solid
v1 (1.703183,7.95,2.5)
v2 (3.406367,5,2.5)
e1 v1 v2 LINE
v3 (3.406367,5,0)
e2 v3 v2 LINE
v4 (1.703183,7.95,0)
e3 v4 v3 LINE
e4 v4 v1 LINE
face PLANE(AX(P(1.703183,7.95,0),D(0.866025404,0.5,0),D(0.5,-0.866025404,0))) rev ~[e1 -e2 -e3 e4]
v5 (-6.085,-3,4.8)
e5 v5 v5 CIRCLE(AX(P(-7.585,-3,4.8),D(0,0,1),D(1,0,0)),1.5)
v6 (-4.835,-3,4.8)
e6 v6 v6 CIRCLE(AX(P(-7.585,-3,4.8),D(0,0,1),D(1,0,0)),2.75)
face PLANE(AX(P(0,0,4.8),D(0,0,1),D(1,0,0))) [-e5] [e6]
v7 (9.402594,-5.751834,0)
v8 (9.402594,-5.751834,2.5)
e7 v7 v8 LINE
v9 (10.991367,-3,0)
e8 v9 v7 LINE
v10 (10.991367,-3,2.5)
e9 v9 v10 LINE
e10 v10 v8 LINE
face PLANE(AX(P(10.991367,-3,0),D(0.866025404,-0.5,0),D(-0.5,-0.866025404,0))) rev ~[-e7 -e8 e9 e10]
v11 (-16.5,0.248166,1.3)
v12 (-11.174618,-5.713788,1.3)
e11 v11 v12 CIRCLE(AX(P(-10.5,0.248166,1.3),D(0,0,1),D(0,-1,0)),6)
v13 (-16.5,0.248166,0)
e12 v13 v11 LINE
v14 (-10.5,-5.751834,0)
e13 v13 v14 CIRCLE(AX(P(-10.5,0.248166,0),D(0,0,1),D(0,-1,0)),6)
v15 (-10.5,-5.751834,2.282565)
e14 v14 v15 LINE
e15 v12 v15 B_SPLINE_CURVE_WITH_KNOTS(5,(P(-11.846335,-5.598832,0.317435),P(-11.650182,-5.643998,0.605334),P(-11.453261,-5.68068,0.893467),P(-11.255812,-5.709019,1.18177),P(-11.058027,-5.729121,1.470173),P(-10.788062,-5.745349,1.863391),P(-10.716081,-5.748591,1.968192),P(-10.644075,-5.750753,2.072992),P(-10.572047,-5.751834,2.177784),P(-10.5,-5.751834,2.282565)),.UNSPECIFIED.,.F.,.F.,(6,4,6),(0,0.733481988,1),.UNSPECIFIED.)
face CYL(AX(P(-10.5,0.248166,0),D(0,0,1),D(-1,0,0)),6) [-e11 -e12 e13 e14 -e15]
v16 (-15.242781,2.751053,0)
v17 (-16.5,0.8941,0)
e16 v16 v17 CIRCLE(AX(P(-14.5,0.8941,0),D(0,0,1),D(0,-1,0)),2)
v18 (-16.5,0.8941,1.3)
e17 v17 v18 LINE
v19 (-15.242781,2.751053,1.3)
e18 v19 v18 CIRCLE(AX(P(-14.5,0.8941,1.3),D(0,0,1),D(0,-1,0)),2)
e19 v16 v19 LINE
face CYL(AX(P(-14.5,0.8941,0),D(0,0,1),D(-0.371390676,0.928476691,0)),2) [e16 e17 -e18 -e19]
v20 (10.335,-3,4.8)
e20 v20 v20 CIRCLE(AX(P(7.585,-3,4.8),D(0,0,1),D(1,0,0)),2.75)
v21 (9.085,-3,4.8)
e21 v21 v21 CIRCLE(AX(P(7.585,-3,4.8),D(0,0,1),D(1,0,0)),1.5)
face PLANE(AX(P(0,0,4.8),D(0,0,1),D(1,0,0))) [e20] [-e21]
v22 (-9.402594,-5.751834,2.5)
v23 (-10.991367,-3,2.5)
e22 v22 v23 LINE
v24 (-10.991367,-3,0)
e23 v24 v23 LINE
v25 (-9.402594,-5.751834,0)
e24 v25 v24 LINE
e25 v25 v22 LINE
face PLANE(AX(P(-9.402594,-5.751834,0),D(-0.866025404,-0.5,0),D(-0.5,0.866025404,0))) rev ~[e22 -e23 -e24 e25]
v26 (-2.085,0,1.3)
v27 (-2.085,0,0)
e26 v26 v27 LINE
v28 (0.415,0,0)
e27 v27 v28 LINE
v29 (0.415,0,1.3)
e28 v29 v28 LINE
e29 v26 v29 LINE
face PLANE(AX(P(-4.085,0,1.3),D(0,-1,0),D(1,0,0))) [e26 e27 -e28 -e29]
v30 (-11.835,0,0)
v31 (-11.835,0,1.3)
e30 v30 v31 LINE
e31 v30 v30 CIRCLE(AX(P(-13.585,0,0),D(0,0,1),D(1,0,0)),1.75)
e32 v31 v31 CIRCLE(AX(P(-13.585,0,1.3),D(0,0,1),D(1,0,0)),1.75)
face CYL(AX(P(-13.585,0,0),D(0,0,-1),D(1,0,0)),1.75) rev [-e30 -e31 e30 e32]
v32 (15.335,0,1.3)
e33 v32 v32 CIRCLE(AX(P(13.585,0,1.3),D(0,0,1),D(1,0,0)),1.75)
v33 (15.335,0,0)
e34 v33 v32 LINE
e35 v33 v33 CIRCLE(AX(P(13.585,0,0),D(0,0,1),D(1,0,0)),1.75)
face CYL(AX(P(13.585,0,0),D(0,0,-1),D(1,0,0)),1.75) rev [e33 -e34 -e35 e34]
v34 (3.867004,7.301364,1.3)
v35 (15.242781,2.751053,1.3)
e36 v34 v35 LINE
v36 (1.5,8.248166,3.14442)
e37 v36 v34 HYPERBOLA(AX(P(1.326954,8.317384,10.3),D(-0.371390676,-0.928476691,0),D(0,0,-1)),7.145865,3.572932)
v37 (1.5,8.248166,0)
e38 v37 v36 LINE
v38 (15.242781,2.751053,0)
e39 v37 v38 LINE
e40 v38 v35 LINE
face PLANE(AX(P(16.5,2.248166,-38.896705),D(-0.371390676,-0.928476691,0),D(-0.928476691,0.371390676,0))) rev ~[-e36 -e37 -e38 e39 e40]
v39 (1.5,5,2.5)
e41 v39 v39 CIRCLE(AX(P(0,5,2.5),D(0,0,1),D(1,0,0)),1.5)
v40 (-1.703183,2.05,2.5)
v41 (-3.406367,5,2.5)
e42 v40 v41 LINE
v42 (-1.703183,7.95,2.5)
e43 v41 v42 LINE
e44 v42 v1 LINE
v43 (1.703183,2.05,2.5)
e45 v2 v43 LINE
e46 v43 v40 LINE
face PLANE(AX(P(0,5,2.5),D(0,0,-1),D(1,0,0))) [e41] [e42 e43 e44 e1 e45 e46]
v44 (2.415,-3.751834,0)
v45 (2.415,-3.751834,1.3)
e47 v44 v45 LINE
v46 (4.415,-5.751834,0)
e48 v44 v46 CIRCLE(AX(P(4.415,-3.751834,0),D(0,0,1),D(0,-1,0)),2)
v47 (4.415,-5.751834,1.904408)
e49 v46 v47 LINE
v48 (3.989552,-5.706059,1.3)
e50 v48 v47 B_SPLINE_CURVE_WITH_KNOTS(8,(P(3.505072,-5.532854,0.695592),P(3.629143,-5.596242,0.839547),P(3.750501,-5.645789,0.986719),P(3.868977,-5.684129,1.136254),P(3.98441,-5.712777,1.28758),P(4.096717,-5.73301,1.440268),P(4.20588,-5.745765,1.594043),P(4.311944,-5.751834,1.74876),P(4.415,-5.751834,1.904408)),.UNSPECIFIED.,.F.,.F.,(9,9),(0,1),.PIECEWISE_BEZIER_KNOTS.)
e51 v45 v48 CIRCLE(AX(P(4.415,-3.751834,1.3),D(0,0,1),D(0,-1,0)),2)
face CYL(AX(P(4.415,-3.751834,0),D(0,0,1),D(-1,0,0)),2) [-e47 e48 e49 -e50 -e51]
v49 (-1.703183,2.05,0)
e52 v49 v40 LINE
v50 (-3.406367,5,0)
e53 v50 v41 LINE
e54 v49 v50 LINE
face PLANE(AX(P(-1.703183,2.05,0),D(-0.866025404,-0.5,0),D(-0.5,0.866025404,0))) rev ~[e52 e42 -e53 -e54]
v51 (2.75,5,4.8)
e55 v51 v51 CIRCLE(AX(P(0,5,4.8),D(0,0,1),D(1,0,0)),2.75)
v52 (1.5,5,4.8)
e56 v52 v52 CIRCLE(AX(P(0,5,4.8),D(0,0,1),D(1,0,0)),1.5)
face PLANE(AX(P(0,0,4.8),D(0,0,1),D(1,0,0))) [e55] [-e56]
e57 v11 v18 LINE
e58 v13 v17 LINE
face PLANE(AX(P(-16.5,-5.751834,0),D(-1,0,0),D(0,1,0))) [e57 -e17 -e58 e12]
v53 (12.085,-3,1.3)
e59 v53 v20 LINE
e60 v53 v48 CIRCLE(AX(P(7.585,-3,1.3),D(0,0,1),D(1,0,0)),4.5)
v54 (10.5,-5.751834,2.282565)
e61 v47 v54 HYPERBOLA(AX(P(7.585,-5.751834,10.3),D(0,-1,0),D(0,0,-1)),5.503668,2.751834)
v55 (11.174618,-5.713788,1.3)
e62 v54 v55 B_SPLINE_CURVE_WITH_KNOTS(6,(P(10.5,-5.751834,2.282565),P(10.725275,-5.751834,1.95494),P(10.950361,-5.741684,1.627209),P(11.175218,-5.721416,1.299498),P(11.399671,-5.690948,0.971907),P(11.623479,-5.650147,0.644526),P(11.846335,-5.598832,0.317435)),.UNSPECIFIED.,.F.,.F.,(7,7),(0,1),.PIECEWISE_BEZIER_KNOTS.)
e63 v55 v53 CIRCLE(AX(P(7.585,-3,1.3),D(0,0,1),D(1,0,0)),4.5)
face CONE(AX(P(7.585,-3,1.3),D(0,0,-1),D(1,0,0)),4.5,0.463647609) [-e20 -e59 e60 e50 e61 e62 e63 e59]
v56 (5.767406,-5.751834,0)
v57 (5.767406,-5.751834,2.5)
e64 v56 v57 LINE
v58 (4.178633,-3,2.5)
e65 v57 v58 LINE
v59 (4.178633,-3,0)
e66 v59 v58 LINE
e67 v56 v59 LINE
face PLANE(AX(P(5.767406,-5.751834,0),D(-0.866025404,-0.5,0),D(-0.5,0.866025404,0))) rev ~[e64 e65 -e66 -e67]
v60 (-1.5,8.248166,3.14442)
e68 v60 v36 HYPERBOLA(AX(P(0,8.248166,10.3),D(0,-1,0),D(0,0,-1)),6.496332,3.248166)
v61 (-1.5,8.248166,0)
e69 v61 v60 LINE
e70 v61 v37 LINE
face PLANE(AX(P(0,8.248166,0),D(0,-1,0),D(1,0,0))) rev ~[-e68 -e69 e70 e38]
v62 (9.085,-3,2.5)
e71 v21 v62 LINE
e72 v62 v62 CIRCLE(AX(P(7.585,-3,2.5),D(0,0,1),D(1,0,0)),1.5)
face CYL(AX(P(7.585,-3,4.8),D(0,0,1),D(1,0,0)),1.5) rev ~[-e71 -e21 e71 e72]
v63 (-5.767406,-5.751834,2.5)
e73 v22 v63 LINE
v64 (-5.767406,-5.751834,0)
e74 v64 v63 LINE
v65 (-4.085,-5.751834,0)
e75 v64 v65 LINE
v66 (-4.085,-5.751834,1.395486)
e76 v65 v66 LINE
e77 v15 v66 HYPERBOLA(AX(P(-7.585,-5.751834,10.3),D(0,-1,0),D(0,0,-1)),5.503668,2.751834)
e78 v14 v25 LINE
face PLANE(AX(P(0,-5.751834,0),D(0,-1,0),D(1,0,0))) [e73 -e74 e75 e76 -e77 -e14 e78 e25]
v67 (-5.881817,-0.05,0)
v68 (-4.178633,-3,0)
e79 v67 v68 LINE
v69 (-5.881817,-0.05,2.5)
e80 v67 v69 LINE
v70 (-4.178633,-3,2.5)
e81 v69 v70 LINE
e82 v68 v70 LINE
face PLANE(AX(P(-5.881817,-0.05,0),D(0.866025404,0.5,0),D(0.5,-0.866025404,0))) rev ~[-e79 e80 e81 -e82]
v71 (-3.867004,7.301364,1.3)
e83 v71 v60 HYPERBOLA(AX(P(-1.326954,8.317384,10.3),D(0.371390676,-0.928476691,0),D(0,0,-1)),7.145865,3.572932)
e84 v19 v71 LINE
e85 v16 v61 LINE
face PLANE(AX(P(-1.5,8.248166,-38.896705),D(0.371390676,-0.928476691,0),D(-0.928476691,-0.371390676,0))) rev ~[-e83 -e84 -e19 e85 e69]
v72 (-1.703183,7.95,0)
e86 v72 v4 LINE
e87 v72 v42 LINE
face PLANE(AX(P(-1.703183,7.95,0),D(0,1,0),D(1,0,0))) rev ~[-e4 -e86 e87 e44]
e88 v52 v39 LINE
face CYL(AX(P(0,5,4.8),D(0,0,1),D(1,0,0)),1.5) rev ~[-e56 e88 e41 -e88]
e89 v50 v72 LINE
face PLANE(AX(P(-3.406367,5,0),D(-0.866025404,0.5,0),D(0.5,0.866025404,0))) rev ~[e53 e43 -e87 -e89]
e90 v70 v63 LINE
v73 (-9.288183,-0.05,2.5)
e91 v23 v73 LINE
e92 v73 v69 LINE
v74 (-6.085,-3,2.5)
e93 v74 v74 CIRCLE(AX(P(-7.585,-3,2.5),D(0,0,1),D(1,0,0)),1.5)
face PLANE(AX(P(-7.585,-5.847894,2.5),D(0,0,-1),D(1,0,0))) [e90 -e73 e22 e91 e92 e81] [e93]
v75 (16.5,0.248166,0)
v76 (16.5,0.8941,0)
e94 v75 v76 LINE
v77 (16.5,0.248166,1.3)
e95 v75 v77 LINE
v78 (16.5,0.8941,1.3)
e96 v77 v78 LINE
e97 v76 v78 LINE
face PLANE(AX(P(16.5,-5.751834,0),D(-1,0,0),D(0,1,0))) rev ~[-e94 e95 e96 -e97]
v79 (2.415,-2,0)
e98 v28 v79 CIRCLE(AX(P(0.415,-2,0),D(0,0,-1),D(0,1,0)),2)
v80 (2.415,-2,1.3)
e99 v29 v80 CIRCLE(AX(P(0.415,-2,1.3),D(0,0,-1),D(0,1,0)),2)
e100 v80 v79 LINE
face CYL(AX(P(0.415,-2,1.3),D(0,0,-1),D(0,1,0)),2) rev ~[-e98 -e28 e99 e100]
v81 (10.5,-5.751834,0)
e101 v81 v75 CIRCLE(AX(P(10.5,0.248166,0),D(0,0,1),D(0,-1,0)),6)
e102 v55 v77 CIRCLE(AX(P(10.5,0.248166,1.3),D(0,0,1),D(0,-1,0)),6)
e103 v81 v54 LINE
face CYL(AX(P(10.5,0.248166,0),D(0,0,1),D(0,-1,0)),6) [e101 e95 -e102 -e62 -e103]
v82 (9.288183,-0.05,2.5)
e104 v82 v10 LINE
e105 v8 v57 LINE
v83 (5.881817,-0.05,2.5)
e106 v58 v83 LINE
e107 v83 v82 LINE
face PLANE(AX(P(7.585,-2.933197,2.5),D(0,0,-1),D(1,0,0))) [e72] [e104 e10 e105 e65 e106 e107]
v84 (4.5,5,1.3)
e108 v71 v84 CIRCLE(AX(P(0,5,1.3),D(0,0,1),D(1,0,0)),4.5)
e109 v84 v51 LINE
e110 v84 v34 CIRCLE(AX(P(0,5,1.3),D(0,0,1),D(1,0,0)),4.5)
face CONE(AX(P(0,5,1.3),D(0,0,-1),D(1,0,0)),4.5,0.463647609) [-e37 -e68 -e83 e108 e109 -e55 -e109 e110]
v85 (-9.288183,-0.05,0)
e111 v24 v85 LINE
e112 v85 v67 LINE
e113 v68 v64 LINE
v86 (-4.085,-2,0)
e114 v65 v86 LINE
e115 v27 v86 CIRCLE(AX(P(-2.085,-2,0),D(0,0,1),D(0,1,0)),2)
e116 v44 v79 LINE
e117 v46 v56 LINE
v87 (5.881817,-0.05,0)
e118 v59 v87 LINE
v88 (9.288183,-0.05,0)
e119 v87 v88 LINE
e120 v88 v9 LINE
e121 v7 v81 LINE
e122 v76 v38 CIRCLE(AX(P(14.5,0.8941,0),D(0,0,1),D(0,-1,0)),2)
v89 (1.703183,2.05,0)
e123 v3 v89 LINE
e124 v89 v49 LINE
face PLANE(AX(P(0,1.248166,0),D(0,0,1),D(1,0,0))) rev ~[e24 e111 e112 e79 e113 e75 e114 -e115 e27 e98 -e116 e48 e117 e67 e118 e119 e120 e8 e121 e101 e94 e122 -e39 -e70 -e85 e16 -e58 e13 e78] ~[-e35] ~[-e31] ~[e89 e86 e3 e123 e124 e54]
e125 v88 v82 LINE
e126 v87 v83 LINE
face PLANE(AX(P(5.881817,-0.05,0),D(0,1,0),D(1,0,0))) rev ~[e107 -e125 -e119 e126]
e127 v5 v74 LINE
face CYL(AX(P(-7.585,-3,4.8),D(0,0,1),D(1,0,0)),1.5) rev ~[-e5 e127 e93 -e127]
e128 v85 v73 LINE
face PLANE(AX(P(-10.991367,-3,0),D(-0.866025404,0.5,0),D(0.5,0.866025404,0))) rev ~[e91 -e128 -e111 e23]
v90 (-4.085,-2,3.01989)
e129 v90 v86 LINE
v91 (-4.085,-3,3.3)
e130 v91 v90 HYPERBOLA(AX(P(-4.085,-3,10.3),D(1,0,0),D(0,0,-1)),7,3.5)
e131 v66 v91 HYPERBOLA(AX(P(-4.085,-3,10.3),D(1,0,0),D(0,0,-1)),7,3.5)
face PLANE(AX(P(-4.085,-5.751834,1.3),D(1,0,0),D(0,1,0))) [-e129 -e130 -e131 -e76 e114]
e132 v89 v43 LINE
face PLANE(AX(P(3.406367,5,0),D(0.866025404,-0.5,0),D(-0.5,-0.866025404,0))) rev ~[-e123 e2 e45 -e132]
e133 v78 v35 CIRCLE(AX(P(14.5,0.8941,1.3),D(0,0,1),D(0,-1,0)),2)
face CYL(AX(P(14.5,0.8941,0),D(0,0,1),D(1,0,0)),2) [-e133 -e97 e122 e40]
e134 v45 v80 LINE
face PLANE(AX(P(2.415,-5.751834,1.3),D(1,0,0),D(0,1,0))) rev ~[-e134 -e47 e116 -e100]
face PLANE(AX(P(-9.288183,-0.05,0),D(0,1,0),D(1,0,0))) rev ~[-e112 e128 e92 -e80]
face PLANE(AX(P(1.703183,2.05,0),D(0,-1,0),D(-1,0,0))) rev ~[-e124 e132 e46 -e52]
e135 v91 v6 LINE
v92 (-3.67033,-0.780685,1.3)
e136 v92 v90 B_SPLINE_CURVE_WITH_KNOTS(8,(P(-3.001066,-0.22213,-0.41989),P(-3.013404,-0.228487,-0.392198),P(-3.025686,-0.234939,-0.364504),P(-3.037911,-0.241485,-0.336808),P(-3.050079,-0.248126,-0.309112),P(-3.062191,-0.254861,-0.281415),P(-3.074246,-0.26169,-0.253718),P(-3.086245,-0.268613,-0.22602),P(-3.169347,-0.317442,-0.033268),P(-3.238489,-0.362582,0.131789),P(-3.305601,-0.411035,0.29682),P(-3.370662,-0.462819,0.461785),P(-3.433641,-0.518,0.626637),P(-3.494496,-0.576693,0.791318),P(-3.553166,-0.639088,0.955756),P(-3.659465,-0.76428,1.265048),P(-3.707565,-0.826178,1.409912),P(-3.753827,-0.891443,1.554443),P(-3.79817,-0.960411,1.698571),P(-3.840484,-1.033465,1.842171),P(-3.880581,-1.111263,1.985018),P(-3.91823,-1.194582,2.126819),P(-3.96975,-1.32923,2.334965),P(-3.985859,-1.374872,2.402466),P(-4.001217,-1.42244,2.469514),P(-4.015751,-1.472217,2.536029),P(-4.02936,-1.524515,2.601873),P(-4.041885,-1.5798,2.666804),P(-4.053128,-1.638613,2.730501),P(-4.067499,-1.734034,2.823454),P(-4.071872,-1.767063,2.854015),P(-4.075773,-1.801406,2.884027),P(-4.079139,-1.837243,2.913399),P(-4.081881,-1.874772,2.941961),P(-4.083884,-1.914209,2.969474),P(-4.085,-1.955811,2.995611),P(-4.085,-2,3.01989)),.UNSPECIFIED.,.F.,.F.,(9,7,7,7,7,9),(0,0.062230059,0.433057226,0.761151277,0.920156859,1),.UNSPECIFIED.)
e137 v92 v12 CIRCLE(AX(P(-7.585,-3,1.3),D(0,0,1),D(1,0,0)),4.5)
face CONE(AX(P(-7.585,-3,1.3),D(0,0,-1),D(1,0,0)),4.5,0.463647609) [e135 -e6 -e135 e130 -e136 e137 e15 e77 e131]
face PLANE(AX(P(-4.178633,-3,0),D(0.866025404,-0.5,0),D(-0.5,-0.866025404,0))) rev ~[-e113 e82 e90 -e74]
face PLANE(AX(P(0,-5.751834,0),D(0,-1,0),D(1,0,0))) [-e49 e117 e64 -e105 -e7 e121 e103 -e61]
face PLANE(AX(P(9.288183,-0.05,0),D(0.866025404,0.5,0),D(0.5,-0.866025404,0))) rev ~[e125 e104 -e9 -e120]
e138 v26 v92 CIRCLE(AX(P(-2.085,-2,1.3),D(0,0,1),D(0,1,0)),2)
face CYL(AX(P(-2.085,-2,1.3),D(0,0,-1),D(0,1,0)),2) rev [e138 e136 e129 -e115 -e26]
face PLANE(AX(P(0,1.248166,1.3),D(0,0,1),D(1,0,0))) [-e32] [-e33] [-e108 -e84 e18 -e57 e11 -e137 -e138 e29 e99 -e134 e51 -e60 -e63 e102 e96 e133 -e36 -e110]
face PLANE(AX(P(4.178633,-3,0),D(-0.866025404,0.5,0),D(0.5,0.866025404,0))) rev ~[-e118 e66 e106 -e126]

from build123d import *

# Parameters (mm, degrees)
F0_W         = 33
F0_H         = 14
F0_R         = 1.75
F1_DEPTH     = 4.8
F2_R         = 1.5
F4_DEPTH     = 4.8
F2_W         = 33
F2_H         = 14
F2_R_2       = 2.5
F2_R_3       = 1.75
F5_DEPTH     = 3.5
F7_DEPTH     = 2.5
F8_W         = 6.5
F8_H         = 5.7518341467
F9_DEPTH     = 12.5
F10_R        = 6
F11_T1_DEPTH = 79.0934091739
F12_R        = 2


# Not quite as in the source:
# - a fillet or chamfer that OpenCascade refuses, or shapes differently, is made with other operations: its cross-section is extruded or revolved along the edge and cut away or added


with BuildPart() as f1:
    # F0 (on Top) → F1 (new body)
    with BuildSketch(Plane.XY):
        with Locations((0, 1.2481658533)):
            Rectangle(F0_W, F0_H)
        with Locations((-13.585, 0)):
            Circle(F0_R, mode=Mode.SUBTRACT)
        with Locations((13.585, 0)):
            Circle(F0_R, mode=Mode.SUBTRACT)
    extrude(amount=F1_DEPTH)

    # F2 (on face) → F4 (cut, through all)
    with BuildSketch(Plane.XY.offset(4.8)):
        with Locations((-7.585, -3)):
            Circle(F2_R)
        with Locations((0, 5)):
            Circle(F2_R)
        with Locations((7.585, -3)):
            Circle(F2_R)
    extrude(amount=-F4_DEPTH, mode=Mode.SUBTRACT)

    # F2 (on face) → F5 (cut)
    with BuildSketch(Plane.XY.offset(4.8)):
        with Locations((0, 1.2481658533)):
            Rectangle(F2_W, F2_H)
        with Locations((-7.585, -3)):
            Circle(F2_R_2, mode=Mode.SUBTRACT)
        with Locations((-13.585, 0)):
            Circle(F2_R_3, mode=Mode.SUBTRACT)
        with Locations((7.585, -3)):
            Circle(F2_R_2, mode=Mode.SUBTRACT)
        with Locations((13.585, 0)):
            Circle(F2_R_3, mode=Mode.SUBTRACT)
        with Locations((0, 5)):
            Circle(F2_R_2, mode=Mode.SUBTRACT)
    extrude(amount=-F5_DEPTH, mode=Mode.SUBTRACT)

    # F6: chamfer of 4 x 2 on 3 edges, made by hand


with BuildPart() as f6_tool2:
    # F6_s3 → F6_t4 (revolve)
    with BuildSketch(Plane.XZ.offset(3)):
        Polygon((-3.085, 1.3), (-5.085, 5.3), (-5.085, 1.3), align=None)
    revolve(axis=Axis((-7.585, -3, 1.3), (0, 0, 1)))

    split(bisect_by=Plane.XZ.offset(5.7518341467), keep=Keep.BOTTOM)

    split(bisect_by=Plane.XY.offset(4.8), keep=Keep.BOTTOM)


with BuildPart() as f1_1:
    add(f1.part)

    # F6_t1: union F6_tool2
    add(f6_tool2.part)


with BuildPart() as f6_tool8:
    # F6_s9 → F6_t10 (revolve)
    with BuildSketch(Plane.XZ.offset(-5)):
        Polygon((4.5, 1.3), (2.5, 5.3), (2.5, 1.3), align=None)
    revolve(axis=Axis((0, 5, 1.3), (0, 0, 1)))

    split(bisect_by=Plane.XZ.offset(-8.2481658533), keep=Keep.TOP)

    split(bisect_by=Plane.XY.offset(4.8), keep=Keep.BOTTOM)


with BuildPart() as f1_2:
    add(f1_1.part)

    # F6_t7: union F6_tool8
    add(f6_tool8.part)


with BuildPart() as f6_tool14:
    # F6_s15 → F6_t16 (revolve)
    with BuildSketch(Plane.XZ.offset(3)):
        Polygon((12.085, 1.3), (10.085, 5.3), (10.085, 1.3), align=None)
    revolve(axis=Axis((7.585, -3, 1.3), (0, 0, 1)))

    split(bisect_by=Plane.XZ.offset(5.7518341467), keep=Keep.BOTTOM)

    split(bisect_by=Plane.XY.offset(4.8), keep=Keep.BOTTOM)


with BuildPart() as f1_3:
    add(f1_2.part)

    # F6_t13: union F6_tool14
    add(f6_tool14.part)

    # F3 (on face) → F7 (cut)
    with BuildSketch(Plane(origin=(0, 0, 0), x_dir=(1, 0, 0), z_dir=(0, 0, -1))):
        Polygon((-5.8818167059, 5.95), (-9.2881832941, 5.95), (-9.4025944029, 5.7518341467), (-5.7674055971, 5.7518341467), align=None)
        Polygon((9.4025944029, 5.7518341467), (5.7674055971, 5.7518341467), (4.1786334118, 3), (5.8818167059, 0.05), (9.2881832941, 0.05), (10.9913665882, 3), align=None)
        Polygon((-1.7031832941, -7.95), (1.7031832941, -7.95), (3.4063665882, -5), (1.7031832941, -2.05), (-1.7031832941, -2.05), (-3.4063665882, -5), align=None)
        Polygon((-5.7674055971, 5.7518341467), (-9.4025944029, 5.7518341467), (-10.9913665882, 3), (-9.2881832941, 0.05), (-5.8818167059, 0.05), (-4.1786334118, 3), align=None)
    extrude(amount=-F7_DEPTH, mode=Mode.SUBTRACT)

    # F8 (on face) → F9 (cut, symmetric)
    with BuildSketch(Plane.XY.offset(1.3)):
        with Locations((-0.835, -2.8759170733)):
            Rectangle(F8_W, F8_H)
    extrude(amount=F9_DEPTH, both=True, mode=Mode.SUBTRACT)

    # F10
    f10_edges = [f1_3.edges().sort_by_distance(p)[0] for p in [
        (-16.5, -5.751834, 0.65),
        (16.5, -5.751834, 0.65),
    ]]
    fillet(f10_edges, radius=F10_R)

    # F11: chamfer of 6 x 15 on 2 edges, made by hand

    # F11_s2 → F11_t1 (cut)
    with BuildSketch(Plane.XY.offset(-38.896704587)):
        Polygon((-1.5, 8.2481658533), (-16.5, 2.2481658533), (-16.5, 8.2481658533), align=None)
        Polygon((16.5, 2.2481658533), (1.5, 8.2481658533), (16.5, 8.2481658533), align=None)
    extrude(amount=F11_T1_DEPTH, mode=Mode.SUBTRACT)

    # F12 (call 1 of 5: OpenCascade refuses the feature's edges together)
    f12_edges = [f1_3.edges().sort_by_distance(p)[0] for p in [
        (-4.085, 0, 0.65),
    ]]
    fillet(f12_edges, radius=F12_R)

    # F12#2 (call 2 of 5)
    f12_2_edges = [f1_3.edges().sort_by_distance(p)[0] for p in [
        (2.415, 0, 0.65),
    ]]
    fillet(f12_2_edges, radius=F12_R)

    # F12#3 (call 3 of 5)
    f12_3_edges = [f1_3.edges().sort_by_distance(p)[0] for p in [
        (2.415, -5.751834, 0.65),
    ]]
    fillet(f12_3_edges, radius=F12_R)

    # F12#4 (call 4 of 5)
    f12_4_edges = [f1_3.edges().sort_by_distance(p)[0] for p in [
        (16.5, 2.248166, 0.65),
    ]]
    fillet(f12_4_edges, radius=F12_R)

    # F12#5 (call 5 of 5)
    f12_5_edges = [f1_3.edges().sort_by_distance(p)[0] for p in [
        (-16.5, 2.248166, 0.65),
    ]]
    fillet(f12_5_edges, radius=F12_R)


solid = f1_3.part
